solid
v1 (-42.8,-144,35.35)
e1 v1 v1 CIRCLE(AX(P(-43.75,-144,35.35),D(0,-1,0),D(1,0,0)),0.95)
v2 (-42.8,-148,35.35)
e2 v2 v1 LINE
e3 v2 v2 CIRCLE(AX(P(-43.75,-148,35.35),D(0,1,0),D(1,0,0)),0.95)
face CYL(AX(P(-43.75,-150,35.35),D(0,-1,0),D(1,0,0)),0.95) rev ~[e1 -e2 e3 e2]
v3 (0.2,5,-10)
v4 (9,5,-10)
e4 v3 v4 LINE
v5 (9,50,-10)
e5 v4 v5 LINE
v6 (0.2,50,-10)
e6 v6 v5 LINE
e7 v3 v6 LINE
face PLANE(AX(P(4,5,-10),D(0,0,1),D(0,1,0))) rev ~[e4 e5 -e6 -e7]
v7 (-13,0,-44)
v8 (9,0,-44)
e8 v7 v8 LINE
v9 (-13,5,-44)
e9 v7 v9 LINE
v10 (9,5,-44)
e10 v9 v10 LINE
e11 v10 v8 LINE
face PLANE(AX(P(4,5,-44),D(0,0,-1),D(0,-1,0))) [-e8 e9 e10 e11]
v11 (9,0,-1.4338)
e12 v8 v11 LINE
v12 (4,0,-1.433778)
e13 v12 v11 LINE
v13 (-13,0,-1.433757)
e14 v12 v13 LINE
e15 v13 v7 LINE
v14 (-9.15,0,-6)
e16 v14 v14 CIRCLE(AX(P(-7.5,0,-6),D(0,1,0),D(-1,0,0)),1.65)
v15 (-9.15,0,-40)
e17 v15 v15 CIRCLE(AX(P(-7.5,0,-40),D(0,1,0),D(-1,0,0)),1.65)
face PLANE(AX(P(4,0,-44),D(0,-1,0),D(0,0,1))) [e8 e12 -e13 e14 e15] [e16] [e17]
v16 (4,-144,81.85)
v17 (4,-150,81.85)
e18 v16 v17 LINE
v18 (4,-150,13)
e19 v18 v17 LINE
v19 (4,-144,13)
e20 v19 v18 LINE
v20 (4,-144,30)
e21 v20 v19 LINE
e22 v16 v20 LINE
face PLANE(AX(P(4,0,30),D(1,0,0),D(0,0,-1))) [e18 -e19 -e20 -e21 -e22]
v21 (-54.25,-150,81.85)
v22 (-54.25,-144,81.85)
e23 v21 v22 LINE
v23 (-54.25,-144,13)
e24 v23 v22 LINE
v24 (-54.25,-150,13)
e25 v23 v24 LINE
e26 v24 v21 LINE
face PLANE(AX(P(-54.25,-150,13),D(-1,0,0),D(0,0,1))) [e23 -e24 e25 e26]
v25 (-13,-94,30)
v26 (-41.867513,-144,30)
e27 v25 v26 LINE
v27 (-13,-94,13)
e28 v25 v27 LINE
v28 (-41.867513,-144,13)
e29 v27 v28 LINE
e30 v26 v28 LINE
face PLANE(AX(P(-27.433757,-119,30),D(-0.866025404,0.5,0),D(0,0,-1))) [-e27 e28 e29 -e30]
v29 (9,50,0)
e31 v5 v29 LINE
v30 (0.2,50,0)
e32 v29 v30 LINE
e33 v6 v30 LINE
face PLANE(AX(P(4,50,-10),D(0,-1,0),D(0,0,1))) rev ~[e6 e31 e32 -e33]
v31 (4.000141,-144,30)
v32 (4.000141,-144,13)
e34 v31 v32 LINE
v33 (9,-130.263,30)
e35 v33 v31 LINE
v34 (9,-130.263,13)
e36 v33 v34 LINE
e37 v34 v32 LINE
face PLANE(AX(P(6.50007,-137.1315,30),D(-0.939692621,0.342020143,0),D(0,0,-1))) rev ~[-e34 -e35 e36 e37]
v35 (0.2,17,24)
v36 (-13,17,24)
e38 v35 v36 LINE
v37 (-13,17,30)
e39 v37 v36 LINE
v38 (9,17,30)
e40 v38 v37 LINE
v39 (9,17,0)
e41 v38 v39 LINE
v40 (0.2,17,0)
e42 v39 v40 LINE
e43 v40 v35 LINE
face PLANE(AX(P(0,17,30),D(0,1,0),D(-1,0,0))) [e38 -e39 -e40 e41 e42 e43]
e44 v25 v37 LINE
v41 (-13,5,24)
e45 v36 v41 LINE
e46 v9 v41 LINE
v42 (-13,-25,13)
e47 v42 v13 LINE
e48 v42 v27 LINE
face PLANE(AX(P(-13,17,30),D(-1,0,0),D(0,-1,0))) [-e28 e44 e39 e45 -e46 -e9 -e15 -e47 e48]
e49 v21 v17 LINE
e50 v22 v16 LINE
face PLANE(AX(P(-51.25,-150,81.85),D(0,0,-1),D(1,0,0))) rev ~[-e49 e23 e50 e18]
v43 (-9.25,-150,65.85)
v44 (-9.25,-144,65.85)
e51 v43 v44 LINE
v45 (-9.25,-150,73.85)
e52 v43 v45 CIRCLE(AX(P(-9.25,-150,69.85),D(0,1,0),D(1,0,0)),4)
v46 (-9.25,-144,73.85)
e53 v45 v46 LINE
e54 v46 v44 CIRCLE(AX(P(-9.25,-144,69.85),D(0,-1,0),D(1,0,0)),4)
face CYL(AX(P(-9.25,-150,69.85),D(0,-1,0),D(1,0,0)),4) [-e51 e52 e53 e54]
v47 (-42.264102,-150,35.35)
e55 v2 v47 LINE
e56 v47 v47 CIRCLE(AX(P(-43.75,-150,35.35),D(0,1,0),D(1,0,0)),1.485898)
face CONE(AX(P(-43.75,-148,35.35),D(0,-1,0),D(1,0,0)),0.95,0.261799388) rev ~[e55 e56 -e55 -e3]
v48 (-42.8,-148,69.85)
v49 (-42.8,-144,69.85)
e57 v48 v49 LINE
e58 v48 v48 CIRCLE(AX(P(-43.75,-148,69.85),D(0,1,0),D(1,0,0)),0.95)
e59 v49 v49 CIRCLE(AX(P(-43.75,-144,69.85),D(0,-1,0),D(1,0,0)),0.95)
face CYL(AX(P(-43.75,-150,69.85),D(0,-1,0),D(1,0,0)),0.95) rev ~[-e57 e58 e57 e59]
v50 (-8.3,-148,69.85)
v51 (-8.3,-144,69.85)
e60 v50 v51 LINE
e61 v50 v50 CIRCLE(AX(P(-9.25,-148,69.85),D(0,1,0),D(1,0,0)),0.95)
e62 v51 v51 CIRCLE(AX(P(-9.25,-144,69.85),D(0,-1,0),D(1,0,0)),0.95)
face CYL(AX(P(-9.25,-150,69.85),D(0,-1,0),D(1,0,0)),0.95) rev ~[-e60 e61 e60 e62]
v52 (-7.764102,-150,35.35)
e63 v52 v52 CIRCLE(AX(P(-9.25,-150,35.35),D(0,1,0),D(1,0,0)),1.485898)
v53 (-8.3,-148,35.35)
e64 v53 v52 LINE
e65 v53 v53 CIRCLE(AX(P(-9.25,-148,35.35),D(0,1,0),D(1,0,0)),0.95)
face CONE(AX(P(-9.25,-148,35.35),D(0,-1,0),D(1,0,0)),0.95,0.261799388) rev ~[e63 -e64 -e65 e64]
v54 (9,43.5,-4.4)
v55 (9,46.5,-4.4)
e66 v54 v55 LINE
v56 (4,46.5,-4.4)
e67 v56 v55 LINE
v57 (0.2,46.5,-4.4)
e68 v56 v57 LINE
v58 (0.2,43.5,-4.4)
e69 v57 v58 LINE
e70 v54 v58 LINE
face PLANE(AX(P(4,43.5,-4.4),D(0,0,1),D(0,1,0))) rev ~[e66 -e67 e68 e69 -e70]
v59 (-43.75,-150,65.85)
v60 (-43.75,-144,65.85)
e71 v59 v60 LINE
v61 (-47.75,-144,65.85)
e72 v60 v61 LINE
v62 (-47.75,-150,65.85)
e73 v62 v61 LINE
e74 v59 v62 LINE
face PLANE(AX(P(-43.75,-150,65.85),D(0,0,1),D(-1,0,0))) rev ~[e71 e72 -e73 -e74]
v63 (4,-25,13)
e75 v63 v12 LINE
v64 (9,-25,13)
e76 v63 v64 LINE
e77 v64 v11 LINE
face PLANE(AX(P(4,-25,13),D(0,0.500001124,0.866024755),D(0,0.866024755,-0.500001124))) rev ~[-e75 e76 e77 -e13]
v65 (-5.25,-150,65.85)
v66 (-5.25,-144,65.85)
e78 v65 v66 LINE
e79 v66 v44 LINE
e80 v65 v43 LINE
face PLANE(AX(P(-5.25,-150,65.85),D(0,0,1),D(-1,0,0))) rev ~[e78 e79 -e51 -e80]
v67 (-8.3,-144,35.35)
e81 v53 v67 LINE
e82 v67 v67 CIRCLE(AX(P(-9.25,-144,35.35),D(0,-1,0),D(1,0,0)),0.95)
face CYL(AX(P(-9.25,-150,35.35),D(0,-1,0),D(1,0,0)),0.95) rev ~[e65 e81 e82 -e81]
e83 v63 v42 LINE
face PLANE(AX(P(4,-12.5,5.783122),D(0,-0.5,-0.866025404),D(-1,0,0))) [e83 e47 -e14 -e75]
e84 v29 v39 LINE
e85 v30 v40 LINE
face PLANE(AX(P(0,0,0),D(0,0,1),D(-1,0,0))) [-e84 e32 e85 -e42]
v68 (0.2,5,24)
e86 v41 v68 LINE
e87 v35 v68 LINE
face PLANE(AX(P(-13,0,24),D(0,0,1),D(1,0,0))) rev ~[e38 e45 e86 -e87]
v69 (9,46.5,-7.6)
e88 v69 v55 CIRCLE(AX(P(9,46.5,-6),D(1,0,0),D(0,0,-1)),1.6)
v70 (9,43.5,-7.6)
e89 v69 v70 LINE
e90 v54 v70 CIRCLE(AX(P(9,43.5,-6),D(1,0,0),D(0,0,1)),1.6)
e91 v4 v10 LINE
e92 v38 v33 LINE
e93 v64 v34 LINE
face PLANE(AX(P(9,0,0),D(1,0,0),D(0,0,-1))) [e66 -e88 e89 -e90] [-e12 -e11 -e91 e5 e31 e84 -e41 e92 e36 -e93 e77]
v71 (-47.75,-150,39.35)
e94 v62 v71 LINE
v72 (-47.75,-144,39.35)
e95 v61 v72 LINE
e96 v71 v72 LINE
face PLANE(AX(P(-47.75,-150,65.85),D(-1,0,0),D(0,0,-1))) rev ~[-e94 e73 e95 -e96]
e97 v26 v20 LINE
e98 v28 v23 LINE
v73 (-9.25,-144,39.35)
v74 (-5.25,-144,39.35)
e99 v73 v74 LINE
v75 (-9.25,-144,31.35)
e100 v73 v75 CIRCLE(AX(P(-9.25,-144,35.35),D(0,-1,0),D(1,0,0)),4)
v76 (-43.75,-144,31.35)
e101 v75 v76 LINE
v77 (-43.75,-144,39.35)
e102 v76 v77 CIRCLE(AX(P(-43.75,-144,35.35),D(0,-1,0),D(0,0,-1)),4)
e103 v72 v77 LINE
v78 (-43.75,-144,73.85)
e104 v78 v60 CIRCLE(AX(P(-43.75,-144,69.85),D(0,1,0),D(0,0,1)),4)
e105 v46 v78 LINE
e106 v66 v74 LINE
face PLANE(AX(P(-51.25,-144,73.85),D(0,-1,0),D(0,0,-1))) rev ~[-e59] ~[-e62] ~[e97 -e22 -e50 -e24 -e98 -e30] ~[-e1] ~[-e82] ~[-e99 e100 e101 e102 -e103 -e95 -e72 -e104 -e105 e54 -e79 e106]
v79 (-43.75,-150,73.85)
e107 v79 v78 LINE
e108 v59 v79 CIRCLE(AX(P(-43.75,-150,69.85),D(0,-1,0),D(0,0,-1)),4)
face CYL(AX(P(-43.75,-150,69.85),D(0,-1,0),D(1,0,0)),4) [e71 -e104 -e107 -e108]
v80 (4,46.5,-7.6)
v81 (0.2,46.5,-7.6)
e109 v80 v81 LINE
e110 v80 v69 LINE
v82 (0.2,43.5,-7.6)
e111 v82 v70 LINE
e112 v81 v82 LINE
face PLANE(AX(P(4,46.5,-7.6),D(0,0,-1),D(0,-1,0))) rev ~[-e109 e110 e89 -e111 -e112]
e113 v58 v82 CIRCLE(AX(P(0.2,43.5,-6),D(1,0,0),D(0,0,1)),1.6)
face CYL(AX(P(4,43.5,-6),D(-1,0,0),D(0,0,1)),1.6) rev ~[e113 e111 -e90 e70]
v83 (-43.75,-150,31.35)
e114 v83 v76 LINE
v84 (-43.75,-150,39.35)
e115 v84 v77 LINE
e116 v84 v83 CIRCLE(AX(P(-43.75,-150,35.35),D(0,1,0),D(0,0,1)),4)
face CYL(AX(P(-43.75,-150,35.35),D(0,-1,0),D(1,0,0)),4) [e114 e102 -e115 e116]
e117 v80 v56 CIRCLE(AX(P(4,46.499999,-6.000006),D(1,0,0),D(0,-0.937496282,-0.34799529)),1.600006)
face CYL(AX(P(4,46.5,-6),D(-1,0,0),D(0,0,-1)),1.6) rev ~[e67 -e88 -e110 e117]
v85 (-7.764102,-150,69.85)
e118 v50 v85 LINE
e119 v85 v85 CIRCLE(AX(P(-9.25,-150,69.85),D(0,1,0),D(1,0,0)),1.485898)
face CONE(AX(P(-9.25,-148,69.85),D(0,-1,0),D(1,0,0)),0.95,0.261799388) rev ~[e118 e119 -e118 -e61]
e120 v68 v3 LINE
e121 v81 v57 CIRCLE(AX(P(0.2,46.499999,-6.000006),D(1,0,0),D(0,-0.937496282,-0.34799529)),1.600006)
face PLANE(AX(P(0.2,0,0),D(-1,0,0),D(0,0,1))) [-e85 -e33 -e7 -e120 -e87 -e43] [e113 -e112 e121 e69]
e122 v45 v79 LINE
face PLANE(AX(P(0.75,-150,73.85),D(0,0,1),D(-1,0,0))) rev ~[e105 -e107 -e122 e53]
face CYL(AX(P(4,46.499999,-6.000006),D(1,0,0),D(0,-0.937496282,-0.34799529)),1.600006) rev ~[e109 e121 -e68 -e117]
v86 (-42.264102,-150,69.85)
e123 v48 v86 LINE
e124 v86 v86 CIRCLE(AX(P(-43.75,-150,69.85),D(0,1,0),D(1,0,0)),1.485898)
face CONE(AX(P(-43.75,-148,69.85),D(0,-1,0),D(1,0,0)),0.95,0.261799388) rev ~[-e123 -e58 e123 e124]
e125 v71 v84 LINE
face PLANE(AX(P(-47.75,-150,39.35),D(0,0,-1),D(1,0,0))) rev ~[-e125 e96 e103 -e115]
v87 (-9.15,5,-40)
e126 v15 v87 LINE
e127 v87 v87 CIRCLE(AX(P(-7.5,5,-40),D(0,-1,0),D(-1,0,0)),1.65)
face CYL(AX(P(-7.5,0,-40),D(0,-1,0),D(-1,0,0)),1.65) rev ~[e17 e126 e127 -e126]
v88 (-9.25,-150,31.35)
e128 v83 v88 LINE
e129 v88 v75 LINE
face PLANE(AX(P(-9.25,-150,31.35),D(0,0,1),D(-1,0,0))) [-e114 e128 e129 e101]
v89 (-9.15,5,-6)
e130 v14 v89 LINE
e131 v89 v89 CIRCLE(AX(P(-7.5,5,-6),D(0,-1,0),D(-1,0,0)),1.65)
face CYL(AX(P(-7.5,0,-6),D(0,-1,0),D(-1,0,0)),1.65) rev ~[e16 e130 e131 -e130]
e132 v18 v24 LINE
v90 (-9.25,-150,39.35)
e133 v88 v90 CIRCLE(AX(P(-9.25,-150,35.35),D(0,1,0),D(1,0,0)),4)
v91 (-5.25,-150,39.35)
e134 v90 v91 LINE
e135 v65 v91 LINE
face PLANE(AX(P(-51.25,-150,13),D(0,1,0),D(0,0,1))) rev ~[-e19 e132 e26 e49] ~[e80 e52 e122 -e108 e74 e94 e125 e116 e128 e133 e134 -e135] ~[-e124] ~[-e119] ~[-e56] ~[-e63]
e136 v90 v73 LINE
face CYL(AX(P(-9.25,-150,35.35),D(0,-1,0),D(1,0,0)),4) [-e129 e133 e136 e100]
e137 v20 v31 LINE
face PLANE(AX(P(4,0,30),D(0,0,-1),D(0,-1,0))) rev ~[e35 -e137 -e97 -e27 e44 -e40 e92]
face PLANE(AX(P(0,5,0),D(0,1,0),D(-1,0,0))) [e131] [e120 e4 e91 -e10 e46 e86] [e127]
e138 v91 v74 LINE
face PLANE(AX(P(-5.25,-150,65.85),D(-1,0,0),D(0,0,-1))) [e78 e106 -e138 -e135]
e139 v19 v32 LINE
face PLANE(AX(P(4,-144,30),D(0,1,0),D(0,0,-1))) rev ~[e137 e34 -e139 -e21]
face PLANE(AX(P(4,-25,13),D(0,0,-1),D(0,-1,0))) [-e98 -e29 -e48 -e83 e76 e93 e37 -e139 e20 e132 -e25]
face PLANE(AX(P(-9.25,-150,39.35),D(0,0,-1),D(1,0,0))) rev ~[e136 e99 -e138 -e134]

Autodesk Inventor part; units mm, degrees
ref_plane "YZ Plane" through (0, 0, 0) normal (1, 0, 0) x (0, 1, 0)
ref_plane "XZ Plane" through (0, 0, 0) normal (0, 1, 0) x (-1, 0, 0)
ref_plane "XY Plane" through (0, 0, 0) normal (0, 0, 1) x (1, 0, 0)
sketch "Sketch1" plane through (0, 0, 0) normal (0, 1, 0) x (-1, 0, 0)
  line L0 (0, 0) -> (13, 0)
  line L1 (13, 0) -> (13, -44)
  line L2 (13, -44) -> (0, -44)
  line L3 (0, -44) -> (0, 0)
  line L4 (13, 0) -> (13, -6)
  line L5 (13, -6) -> (7.5, -6)
  line L6 (7.5, -6) -> (7.5, -40)
  circle A0 centre (7.5, -6) radius 1.65
  circle A1 centre (7.5, -40) radius 1.65
  dimension "d0" = 13
  dimension "d1" = 44
  dimension "d2" = 6
  dimension "d3" = 5.5
  dimension "d4" = 34
  dimension "d5" = 3.3
  dimension "d6" = 3.3
extrude "Extrusion1" add sketch "Sketch1" along normal blind 5
sketch "Sketch2" plane through (0, 0, 0) normal (1, 0, 0) x (0, 0, -1)
  line L0 (0, 5) -> (44, 5) projected
  line L1 (0, 5) -> (44, 5)
  line L2 (44, 5) -> (44, 50)
  line L3 (44, 50) -> (0, 50)
  line L4 (0, 50) -> (0, 5)
  line L5 (0, 0) -> (44, 0)
  line L6 (44, 0) -> (44, 5)
  line L7 (44, 5) -> (0, 5)
  line L8 (0, 5) -> (0, 0)
  line L9 (0, 50) -> (10, 50)
  line L10 (10, 50) -> (10, 5)
  line L11 (10, 5) -> (0, 5)
  line L12 (0, 5) -> (0, 50)
  dimension "d9" = 44
  dimension "d10" = 45
  dimension "d11" = 10
extrude "Extrusion2" add sketch "Sketch2" along normal blind 4 contours L4 L3 L10 L0 | L0 L6 L5 L8
sketch "Sketch3" plane through (4, 0, 0) normal (1, 0, 0) x (0, 0, -1)
  line L0 (44, 5) -> (10, 5) projected
  line L1 (10, 5) -> (10, 45)
  line L2 (10, 5) -> (10, 50) projected
  line L3 (0, 50) -> (0, 5) projected
  line L4 (0, 45) -> (4.4, 45)
  line L5 (6, 45) -> (6, 46.5)
  line L6 (6, 45) -> (6, 43.5)
  line L7 (4.4, 46.5) -> (4.4, 43.5)
  line L8 (7.6, 46.5) -> (7.6, 43.5)
  arc A0 (5.4432, 45) -> (6, 44.9) centre (6, 46.5) ccw
  arc A1 (6.5568, 45) -> (4.4, 46.5) centre (6, 46.5) ccw
  line L9 (10, 45) -> (6.5568, 45)
  line L10 (5.4432, 45) -> (0, 45)
  arc A2 (6, 45.1) -> (5.4432, 45) centre (6, 43.5) ccw
  arc A3 (4.4, 43.5) -> (7.6, 43.5) centre (6, 43.5) ccw
  point P0 (0, 0)
  dimension "d14" = 40
  dimension "d15" = 6
  dimension "d16" = 1.5
  dimension "d17" = 1.5
extrude "Extrusion3" cut sketch "Sketch3" against normal blind 4 contours L6 A0 A2 L5 | A1 L9 L8 A3 L7 | L8 L9 A1
sketch "Sketch4" plane through (-13, 0, 0) normal (0, 0, 1) x (1, 0, 0)
  line L0 (0, 0) -> (17, 0) projected
  line L1 (17, 0) -> (17, 5) projected
  line L2 (0, 0) -> (17, 0)
  line L3 (17, 0) -> (17, 5)
  line L4 (17, 5) -> (0, 5)
  line L5 (0, 5) -> (0, 0)
  line L6 (13, 50) -> (13, 5) projected
  line L7 (17, 0) -> (13, 0)
  line L8 (13, 0) -> (13, 17)
  line L9 (13, 17) -> (17, 17)
  line L10 (17, 17) -> (17, 0)
  dimension "d22" = 17
extrude "Extrusion4" add sketch "Sketch4" along normal blind 30
sketch "Sketch5" plane through (0, 0, 0) normal (0, -1, 0) x (1, 0, 0)
  line L0 (-13, -44) -> (-13, 30) projected
  line L1 (-13, 30) -> (4, 30)
  line L2 (4, 30) -> (4, 13)
  line L3 (4, 13) -> (-13, 13)
  line L4 (-13, 13) -> (-13, 30)
  point P0 (0, 0)
  dimension "d25" = 17
  dimension "d26" = 17
extrude "Extrusion5" add sketch "Sketch5" along normal blind 150
sketch "Sketch7" plane through (0, -150, 0) normal (0, -1, 0) x (1, 0, 0)
  line L0 (4, 13) -> (-13, 13) projected
  line L1 (0, 30) -> (0, -10) projected
  line L2 (0, 13) -> (0, 30)
  line L3 (0, 30) -> (0, 52.6)
  circle A0 centre (-36, 52.6) radius 9
  line L4 (-36, 52.6) -> (-36, 36.6)
  line L5 (-36, 36.6) -> (-20, 36.6)
  line L6 (-36, 52.6) -> (-36, 68.6)
  line L7 (-36, 68.6) -> (-52, 68.6)
  line L8 (-52, 68.6) -> (-20, 68.6)
  line L9 (-20, 68.6) -> (-20, 36.6)
  line L10 (-20, 36.6) -> (-52, 36.6)
  line L11 (-52, 36.6) -> (-52, 68.6)
  circle A1 centre (-20, 68.6) radius 1.1
  circle A2 centre (-20, 36.6) radius 1.1
  circle A3 centre (-52, 36.6) radius 1.1
  circle A4 centre (-52, 68.6) radius 1.1
  circle A5 centre (-20, 68.6) radius 4
  circle A6 centre (-20, 36.6) radius 4
  line L12 (-52, 65.6) -> (-52, 70.6)
  line L13 (-52, 36.6) -> (-52, 42.6)
  circle A7 centre (-52, 68.6) radius 4
  circle A8 centre (-52, 36.6) radius 4
  point P0 (0, 0)
  point P1 (-20, 64.6)
  point P2 (-20, 40.6)
  dimension "d29" = 22.6
  dimension "d31" = 18
  dimension "d32" = 16
  dimension "d33" = 16
  dimension "d34" = 16
  dimension "d35" = 16
  dimension "d36" = 2.2
  dimension "d37" = 2.2
  dimension "d39" = 2.2
  dimension "d40" = 8
  dimension "d43" = 8
  dimension "d49" = 8
  dimension "d50" = 8
sketch "Sketch14" plane through (0, -150, 0) normal (0, -1, 0) x (1, 0, 0)
  line L0 (4, 13) -> (4, 30) projected
  line L1 (4, 13) -> (4, 52.6)
  line L2 (4, 52.6) -> (-26.5, 52.6)
  line L3 (-26.5, 52.6) -> (-26.5, 35.35)
  line L4 (-26.5, 35.35) -> (-9.25, 35.35)
  line L5 (-26.5, 52.6) -> (-43.75, 52.6)
  line L6 (-43.75, 52.6) -> (-43.75, 69.85)
  line L7 (-43.75, 69.85) -> (-9.25, 69.85)
  line L8 (-9.25, 69.85) -> (-9.25, 35.35)
  line L9 (-9.25, 35.35) -> (-43.75, 35.35)
  line L10 (-43.75, 35.35) -> (-43.75, 69.85)
  circle A0 centre (-43.75, 69.85) radius 0.95
  circle A1 centre (-9.25, 69.85) radius 0.95
  circle A2 centre (-9.25, 35.35) radius 0.95
  circle A3 centre (-43.75, 35.35) radius 0.95
  circle A4 centre (-43.75, 69.85) radius 4
  circle A5 centre (-9.25, 69.85) radius 4
  circle A6 centre (-9.25, 35.35) radius 4
  circle A7 centre (-43.75, 35.35) radius 4
  point P0 (0, 0)
  dimension "d91" = 39.6
  dimension "d92" = 30.5
  dimension "d93" = 17.25
  dimension "d94" = 17.25
  dimension "d95" = 17.25
  dimension "d96" = 17.25
  dimension "d97" = 1.9
  dimension "d98" = 1.9
  dimension "d99" = 1.9
  dimension "d100" = 1.9
  dimension "d101" = 8
  dimension "d102" = 8
  dimension "d103" = 8
  dimension "d104" = 8
extrude "Extrusion14" add sketch "Sketch14" against normal blind 6 contours A5 L7 A1 L8 | L8 A1 L7 A5 | A6 L4 A2 L8 | L8 A2 L4 A6 | A7 L10 A3 L9 | L9 A3 L10 A7 | A4 L7 A0 L6 | L6 A0 L7 A4
sketch "Sketch15" plane through (-9.25, -150, 69.85) normal (0, -1, 0) x (1, 0, 0)
  circle A0 centre (0, 0) radius 4 projected
  line L0 (0, 4) -> (10, 4)
  line L1 (10, 4) -> (10, -4)
  line L2 (10, -4) -> (0, -4)
  line L3 (0, -4) -> (0, 4)
  circle A1 centre (0, -34.5) radius 4 projected
  line L4 (0, -30.5) -> (10, -30.5)
  line L5 (10, -30.5) -> (10, -38.5)
  line L6 (10, -38.5) -> (0, -38.5)
  line L7 (0, -38.5) -> (0, -30.5)
  circle A2 centre (-34.5, -34.5) radius 4 projected
  line L8 (-34.5, -38.5) -> (-44.5, -38.5)
  line L9 (-44.5, -38.5) -> (-44.5, -30.5)
  line L10 (-44.5, -30.5) -> (-34.5, -30.5)
  line L11 (-34.5, -30.5) -> (-34.5, -38.5)
  circle A3 centre (-34.5, 0) radius 4 projected
  line L12 (-34.5, -4) -> (-44.5, -4)
  line L13 (-44.5, -4) -> (-44.5, 4)
  line L14 (-44.5, 4) -> (-34.5, 4)
  line L15 (-34.5, 4) -> (-34.5, -4)
  line L16 (-44.5, 4) -> (-38.5, 4)
  line L17 (-38.5, 4) -> (-38.5, -38.5)
  line L18 (-38.5, -38.5) -> (-44.5, -38.5)
  line L19 (-44.5, -38.5) -> (-44.5, 4)
  line L20 (10, 4) -> (4, 4)
  line L21 (4, 4) -> (4, -38.5)
  line L22 (4, -38.5) -> (10, -38.5)
  line L23 (10, -38.5) -> (10, 4)
  point P0 (9.25, -69.85)
  point P1 (-38.5, -4)
  point P2 (-34.5, 4)
  point P3 (-34.5, -30.5)
  point P4 (-38.5, -30.5)
  point P5 (0, -4)
  point P6 (4, -4)
  point P7 (4, -30.5)
  point P8 (0, -38.5)
  point P9 (10, -4)
  dimension "d107" = 10
  dimension "d108" = 8
  dimension "d109" = 10
  dimension "d110" = 8
  dimension "d111" = 10
  dimension "d112" = 8
  dimension "d113" = 10
  dimension "d114" = 8
  dimension "d115" = 6
  dimension "d116" = 6
extrude "Extrusion15" add sketch "Sketch15" against normal blind 6 contours L21 L2 A0 | A0 L0 L21 | L21 L0 L1 L2 | L2 L23 L4 L21 | L21 A1 L4 | L4 L5 L6 L21 | L21 L6 A1 | A2 L17 L10 | L8 L17 A2 | L17 L8 L9 L10 | L10 L19 L12 L17 | L17 A3 L12 | L12 L13 L14 L17 | L17 L14 A3
sketch "Sketch16" plane through (0, -150, 0) normal (0, -1, 0) x (1, 0, 0)
  line L0 (0.75, 73.85) -> (0.75, 31.35) projected
  line L1 (0.75, 73.85) -> (-51.25, 73.85)
  line L2 (-51.25, 73.85) -> (-51.25, 81.85)
  line L3 (-51.25, 81.85) -> (0.75, 81.85)
  line L4 (0.75, 81.85) -> (0.75, 73.85)
  line L5 (0.75, 31.35) -> (-9.25, 31.35) projected
  line L6 (0.75, 31.35) -> (-51.25, 31.35)
  line L7 (-51.25, 31.35) -> (-51.25, 23.35)
  line L8 (-51.25, 23.35) -> (0.75, 23.35)
  line L9 (0.75, 23.35) -> (0.75, 31.35)
  point P0 (0, 0)
  dimension "d119" = 8
  dimension "d120" = 8
extrude "Extrusion16" add sketch "Sketch16" against normal blind 6
sketch "Sketch17" plane through (0, -144, 0) normal (0, 1, 0) x (1, 0, 0)
  line L0 (0.75, -81.85) -> (0.75, -30) projected
  line L1 (4, -30) -> (0, -30) projected
  line L2 (0.75, -81.85) -> (4, -81.85)
  line L3 (4, -81.85) -> (4, -30)
  line L4 (4, -30) -> (0.75, -30)
  line L5 (0.75, -30) -> (0.75, -81.85)
  line L6 (-51.25, -23.35) -> (-51.25, -81.85) projected
  line L7 (-51.25, -23.35) -> (-13, -23.35)
  line L8 (-13, -23.35) -> (-13, -13)
  line L9 (-13, -13) -> (-51.25, -13)
  line L10 (-51.25, -13) -> (-51.25, -23.35)
  point P0 (0, 0)
  point P1 (0.75, -30)
  point P2 (0.75, -30)
extrude "Extrusion17" add sketch "Sketch17" against normal blind 6
chamfer "Chamfer4" distance 50 angle 30 1 edges at (-13, -144, 21.5) measured on face at (-13, -46.3333, 24.3333)
chamfer "Chamfer5" distance 25 angle 30 1 edges at (-4.5, 0, 13) measured on face at (-1.6667, -81.3333, 13)
sketch "Sketch19" plane through (-13, 0, 30) normal (0, 0, 1) x (1, 0, 0)
  line L0 (13, 17) -> (13, 5) projected
  line L1 (0, 0) -> (0, 5) projected
  line L2 (13, 17) -> (0, 17)
  line L3 (0, 17) -> (0, 5)
  line L4 (0, 5) -> (13, 5)
  line L5 (13, 5) -> (13, 17)
  point P0 (13, 0)
extrude "Extrusion18" add sketch "Sketch19" against normal blind 6
sketch "Sketch20" plane through (-51.25, -150, 13) normal (-1, 0, 0) x (0, 0, 1)
  line L0 (0, 125) -> (0, 0) projected
  line L1 (60.85, 6) -> (68.85, 6) projected
  line L2 (0, 0) -> (68.85, 0)
  line L3 (68.85, 0) -> (68.85, 6)
  line L4 (68.85, 6) -> (0, 6)
  line L5 (0, 6) -> (0, 0)
  point P0 (-13, 150)
extrude "Extrusion19" add sketch "Sketch20" along normal blind 3
sketch "Sketch21" plane through (0, 0, 0) normal (-1, 0, 0) x (0, 0, 1)
  line L0 (-10, 5) -> (-10, 50) projected
  line L1 (24, 5) -> (-10, 5) projected
  line L2 (-10, 50) -> (24, 50)
  line L3 (24, 50) -> (24, 5)
  line L4 (24, 5) -> (-10, 5)
  line L5 (-10, 5) -> (-10, 50)
  point P0 (0, 0)
extrude "Extrusion20" cut sketch "Sketch21" against normal blind 0.2
chamfer "Chamfer6" distance 2 angle 15 1 edges at (-10.2, -150, 69.85) measured on face at (-8.3489, -146, 69.5492)
chamfer "Chamfer7" distance 2 angle 15 1 edges at (-10.2, -150, 35.35) measured on face at (-8.6492, -146, 36.0859)
chamfer "Chamfer8" distance 2 angle 15 1 edges at (-44.7, -150, 35.35) measured on face at (-43.7117, -146, 34.4008)
chamfer "Chamfer9" distance 2 angle 15 1 edges at (-44.7, -150, 69.85) measured on face at (-42.8489, -146, 69.5492)
sketch "Sketch22" plane through (4, 0, 0) normal (1, 0, 0) x (0, 0, -1)
  line L0 (44, 0) -> (1.4338, 0) projected
  line L1 (-30, 17) -> (-30, -144) projected
  line L2 (44, 0) -> (-30, 0)
  line L3 (-30, 0) -> (-30, 17)
  line L4 (-30, 17) -> (44, 17)
  line L5 (44, 17) -> (44, 0)
  line L6 (10, 50) -> (0, 50) projected
  line L7 (10, 50) -> (0, 50)
  line L8 (0, 50) -> (0, 0)
  line L9 (0, 0) -> (10, 0)
  line L10 (10, 0) -> (10, 50)
  line L11 (10, 5) -> (10, 50) projected
  line L12 (44, 17) -> (10, 17)
  line L13 (10, 17) -> (10, 5)
  line L14 (10, 5) -> (44, 5)
  line L15 (44, 5) -> (44, 17)
  arc A0 (4.4, 43.5) -> (7.6, 43.5) centre (6, 43.5) ccw projected
  circle A1 centre (6, 43.5) radius 1.6
  arc A2 (7.6, 46.5) -> (4.4, 46.5) centre (6, 46.5) ccw projected
  circle A3 centre (6, 46.5) radius 1.6
  line L16 (7.6, 46.5) -> (7.6, 43.5) projected
  line L17 (7.6, 46.5) -> (7.6, 43.5)
  line L18 (7.6, 43.5) -> (4.4, 43.5)
  line L19 (4.4, 43.5) -> (4.4, 46.5) projected
  line L20 (4.4, 46.5) -> (4.4, 43.5)
  point P0 (0, 17)
  point P1 (1.4338, 0)
extrude "Extrusion21" add sketch "Sketch22" along normal blind 5 contours L0 L10 L14 L5 | L0 L2 L8 L4 L10 | L2 L1 L4 L8 | L4 L8 L6 L10
sketch "Sketch23" plane through (4, 0, 0) normal (1, 0, 0) x (0, 0, -1)
  line L0 (-13, -25) -> (-13, -94) projected
  line L1 (-13, -25) -> (1.4338, 0) projected
  line L2 (-13, -25) -> (1.4338, 0)
  line L3 (-30, 0) -> (44, 0) projected
  line L4 (1.4338, 0) -> (-30, 0)
  line L5 (-30, 0) -> (-30, -144) projected
  line L6 (-30, 0) -> (-30, -144)
  line L7 (-81.85, -144) -> (-13, -144) projected
  line L8 (-30, -144) -> (-13, -144)
  line L9 (-13, -144) -> (-13, -25)
  point P0 (0, 0)
extrude "Extrusion22" add sketch "Sketch23" along normal blind 5
chamfer "Chamfer10" distance 13.737 angle 20 1 edges at (9, -144, 21.5) measured on face at (9, -50.6667, 24.3333)
properties part number "camera_mount_v2"
